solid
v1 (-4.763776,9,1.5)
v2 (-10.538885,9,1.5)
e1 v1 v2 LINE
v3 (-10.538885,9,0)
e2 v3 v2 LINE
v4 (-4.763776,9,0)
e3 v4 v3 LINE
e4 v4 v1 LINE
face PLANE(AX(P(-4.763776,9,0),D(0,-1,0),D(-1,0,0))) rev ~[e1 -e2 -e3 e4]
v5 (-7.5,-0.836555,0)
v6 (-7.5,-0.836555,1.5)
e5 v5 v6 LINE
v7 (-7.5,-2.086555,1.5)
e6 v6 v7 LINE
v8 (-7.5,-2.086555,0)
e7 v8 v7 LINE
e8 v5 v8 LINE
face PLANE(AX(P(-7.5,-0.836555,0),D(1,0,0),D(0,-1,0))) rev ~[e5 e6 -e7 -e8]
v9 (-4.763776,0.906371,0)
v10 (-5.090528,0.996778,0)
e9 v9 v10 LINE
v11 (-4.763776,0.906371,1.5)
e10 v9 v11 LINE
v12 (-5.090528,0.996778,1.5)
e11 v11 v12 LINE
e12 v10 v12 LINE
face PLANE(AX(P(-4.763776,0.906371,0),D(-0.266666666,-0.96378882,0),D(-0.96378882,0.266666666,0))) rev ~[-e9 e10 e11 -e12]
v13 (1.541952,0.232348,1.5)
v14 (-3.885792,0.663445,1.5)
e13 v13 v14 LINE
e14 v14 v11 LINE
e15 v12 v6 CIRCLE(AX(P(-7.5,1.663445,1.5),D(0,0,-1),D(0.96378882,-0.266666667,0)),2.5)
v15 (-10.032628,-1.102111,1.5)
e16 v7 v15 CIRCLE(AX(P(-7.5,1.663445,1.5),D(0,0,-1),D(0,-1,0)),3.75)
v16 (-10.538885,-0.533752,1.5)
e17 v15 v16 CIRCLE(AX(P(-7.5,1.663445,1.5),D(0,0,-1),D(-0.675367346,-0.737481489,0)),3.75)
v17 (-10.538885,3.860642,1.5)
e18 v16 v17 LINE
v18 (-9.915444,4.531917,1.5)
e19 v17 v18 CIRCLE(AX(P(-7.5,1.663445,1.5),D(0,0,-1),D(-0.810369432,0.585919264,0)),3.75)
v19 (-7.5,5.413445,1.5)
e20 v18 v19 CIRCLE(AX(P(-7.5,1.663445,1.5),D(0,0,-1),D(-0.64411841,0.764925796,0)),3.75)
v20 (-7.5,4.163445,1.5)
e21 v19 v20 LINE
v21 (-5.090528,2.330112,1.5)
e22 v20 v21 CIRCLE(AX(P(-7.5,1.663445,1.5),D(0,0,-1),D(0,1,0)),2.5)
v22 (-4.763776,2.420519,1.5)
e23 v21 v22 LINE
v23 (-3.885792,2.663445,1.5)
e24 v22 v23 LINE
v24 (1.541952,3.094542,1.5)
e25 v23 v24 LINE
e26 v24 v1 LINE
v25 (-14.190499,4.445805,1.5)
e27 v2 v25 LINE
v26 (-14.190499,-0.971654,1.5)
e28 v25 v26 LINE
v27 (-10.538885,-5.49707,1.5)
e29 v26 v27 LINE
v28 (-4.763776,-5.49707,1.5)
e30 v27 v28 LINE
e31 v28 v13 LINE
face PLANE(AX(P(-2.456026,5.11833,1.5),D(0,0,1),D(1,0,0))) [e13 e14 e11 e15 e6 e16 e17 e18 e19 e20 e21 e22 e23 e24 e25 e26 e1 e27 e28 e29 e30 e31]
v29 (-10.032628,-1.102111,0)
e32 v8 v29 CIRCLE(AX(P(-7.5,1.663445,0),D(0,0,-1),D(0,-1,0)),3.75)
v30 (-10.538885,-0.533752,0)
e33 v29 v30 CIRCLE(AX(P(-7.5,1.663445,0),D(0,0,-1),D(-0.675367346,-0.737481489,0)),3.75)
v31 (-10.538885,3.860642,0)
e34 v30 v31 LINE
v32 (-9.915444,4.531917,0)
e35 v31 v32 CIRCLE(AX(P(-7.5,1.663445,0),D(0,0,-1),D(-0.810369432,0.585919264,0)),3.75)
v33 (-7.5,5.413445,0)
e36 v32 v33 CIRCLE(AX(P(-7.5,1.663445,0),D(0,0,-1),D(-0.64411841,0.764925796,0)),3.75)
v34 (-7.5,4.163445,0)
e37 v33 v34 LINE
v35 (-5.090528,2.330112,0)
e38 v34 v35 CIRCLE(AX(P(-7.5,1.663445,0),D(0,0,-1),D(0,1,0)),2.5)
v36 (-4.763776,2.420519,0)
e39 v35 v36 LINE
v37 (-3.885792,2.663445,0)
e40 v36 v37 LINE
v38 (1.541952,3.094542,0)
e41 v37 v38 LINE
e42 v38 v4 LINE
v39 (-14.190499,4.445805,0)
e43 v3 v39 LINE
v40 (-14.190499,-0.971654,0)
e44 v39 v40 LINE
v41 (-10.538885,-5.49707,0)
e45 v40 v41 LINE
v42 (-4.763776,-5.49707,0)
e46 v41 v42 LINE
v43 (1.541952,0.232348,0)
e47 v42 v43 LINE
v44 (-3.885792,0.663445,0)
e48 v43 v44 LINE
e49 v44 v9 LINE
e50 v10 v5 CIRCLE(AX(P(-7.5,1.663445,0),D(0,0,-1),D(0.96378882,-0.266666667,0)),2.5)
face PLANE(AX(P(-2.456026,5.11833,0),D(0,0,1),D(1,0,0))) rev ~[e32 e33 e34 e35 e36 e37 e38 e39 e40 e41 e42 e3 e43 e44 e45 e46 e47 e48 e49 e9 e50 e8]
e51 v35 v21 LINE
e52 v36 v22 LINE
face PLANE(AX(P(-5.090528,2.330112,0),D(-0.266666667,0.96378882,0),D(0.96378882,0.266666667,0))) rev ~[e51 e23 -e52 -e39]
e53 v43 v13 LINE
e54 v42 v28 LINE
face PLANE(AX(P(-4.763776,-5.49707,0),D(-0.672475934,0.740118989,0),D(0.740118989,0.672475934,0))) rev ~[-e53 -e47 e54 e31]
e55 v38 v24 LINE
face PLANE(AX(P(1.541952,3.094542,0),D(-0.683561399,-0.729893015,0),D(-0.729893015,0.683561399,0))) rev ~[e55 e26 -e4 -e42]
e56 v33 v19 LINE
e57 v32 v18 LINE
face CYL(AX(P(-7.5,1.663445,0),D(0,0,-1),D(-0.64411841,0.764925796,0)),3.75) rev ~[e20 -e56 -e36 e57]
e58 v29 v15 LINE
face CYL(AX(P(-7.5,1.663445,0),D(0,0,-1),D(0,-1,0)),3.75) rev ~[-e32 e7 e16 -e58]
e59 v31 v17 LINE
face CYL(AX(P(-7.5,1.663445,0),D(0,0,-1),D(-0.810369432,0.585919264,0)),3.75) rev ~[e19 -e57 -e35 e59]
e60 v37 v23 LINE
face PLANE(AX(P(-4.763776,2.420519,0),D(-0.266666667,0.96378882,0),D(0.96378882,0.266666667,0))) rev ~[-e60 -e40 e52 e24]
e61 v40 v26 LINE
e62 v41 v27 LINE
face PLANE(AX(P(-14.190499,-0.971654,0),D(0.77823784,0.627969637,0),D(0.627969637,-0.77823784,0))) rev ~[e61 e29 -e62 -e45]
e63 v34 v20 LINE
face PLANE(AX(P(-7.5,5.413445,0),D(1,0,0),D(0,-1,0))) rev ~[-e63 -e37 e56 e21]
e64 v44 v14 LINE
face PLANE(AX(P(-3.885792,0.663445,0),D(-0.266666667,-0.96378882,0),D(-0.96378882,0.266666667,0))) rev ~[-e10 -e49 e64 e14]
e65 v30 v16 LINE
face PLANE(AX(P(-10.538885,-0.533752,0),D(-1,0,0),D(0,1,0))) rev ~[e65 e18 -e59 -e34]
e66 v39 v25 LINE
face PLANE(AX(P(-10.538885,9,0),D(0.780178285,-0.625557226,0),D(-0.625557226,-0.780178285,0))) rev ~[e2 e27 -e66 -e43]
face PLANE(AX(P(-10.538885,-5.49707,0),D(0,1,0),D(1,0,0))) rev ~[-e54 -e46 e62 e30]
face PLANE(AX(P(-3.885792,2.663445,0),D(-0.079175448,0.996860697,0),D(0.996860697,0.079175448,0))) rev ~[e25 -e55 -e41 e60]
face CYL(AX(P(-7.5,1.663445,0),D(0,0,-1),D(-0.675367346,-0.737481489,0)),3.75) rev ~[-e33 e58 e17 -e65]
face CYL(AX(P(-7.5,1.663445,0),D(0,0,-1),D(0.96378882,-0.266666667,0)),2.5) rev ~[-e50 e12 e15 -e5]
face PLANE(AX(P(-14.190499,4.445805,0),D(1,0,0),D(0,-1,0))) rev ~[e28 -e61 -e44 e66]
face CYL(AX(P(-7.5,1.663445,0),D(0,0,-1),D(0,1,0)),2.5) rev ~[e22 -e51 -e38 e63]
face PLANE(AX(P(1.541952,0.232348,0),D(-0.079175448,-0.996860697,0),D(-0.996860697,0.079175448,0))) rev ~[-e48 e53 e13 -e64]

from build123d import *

# Parameters (mm, degrees)
F1_DEPTH = 1.5


# Not quite as in the source:
# - a feature names something its author has since deleted; it is built from what else it names


with BuildPart() as f1:
    # F0 (on Top) → F1 (new body)
    with BuildSketch(Plane.XY):
        with BuildLine():
            ThreePointArc((-4.7637764364, 4.2277344156), (-4.22987066, 3.4988615225), (-3.8857919263, 2.6634449214))
            Line((-3.8857919263, 2.6634449214), (1.5419516712, 3.0945423002))
            Line((1.5419516712, 3.0945423002), (-4.7637764364, 9))
            Line((-4.7637764364, 9), (-4.7637764364, 4.2277344156))
        make_face()
        with BuildLine():
            ThreePointArc((-7.5, -2.0865550786), (-6.0089576806, -1.7773824212), (-4.7637764364, -0.9008445729))
            Line((-4.7637764364, -0.9008445729), (-4.7637764364, 0.9063707553))
            Line((-4.7637764364, 0.9063707553), (-5.0905279509, 0.9967782547))
            ThreePointArc((-5.0905279509, 0.9967782547), (-5.986174823, -0.326111143), (-7.5, -0.8365550786))
            Line((-7.5, -0.8365550786), (-7.5, -2.0865550786))
        make_face()
        with BuildLine():
            Line((-4.7637764364, 2.4205190875), (-4.7637764364, 4.2277344156))
            ThreePointArc((-4.7637764364, 4.2277344156), (-6.0089576806, 5.104272264), (-7.5, 5.4134449214))
            Line((-7.5, 5.4134449214), (-7.5, 4.1634449214))
            ThreePointArc((-7.5, 4.1634449214), (-5.986174823, 3.6530009858), (-5.0905279509, 2.330111588))
            Line((-5.0905279509, 2.330111588), (-4.7637764364, 2.4205190875))
        make_face()
        with BuildLine():
            Line((-10.5388853699, 1.6634449214), (-10.5388853699, 3.8606421607))
            ThreePointArc((-10.5388853699, 3.8606421607), (-11.0677948468, 2.8181483168), (-11.25, 1.6634449214))
            Line((-11.25, 1.6634449214), (-10.5388853699, 1.6634449214))
        make_face()
        with BuildLine():
            ThreePointArc((-11.25, 1.6634449214), (-11.0677948468, 0.5087415259), (-10.5388853699, -0.533752318))
            Line((-10.5388853699, -0.533752318), (-10.5388853699, 1.6634449214))
            Line((-10.5388853699, 1.6634449214), (-11.25, 1.6634449214))
        make_face()
        with BuildLine():
            Line((1.5419516712, 0.2323475426), (-3.8857919263, 0.6634449214))
            ThreePointArc((-3.8857919263, 0.6634449214), (-4.22987066, -0.1719716798), (-4.7637764364, -0.9008445729))
            Line((-4.7637764364, -0.9008445729), (-4.7637764364, -5.4970695637))
            Line((-4.7637764364, -5.4970695637), (1.5419516712, 0.2323475426))
        make_face()
        with BuildLine():
            Line((-4.7637764364, -5.4970695637), (-4.7637764364, -0.9008445729))
            ThreePointArc((-4.7637764364, -0.9008445729), (-6.0089576806, -1.7773824212), (-7.5, -2.0865550786))
            ThreePointArc((-7.5, -2.0865550786), (-8.8586144698, -1.831789938), (-10.0326275495, -1.102110664))
            ThreePointArc((-10.0326275495, -1.102110664), (-10.300213716, -0.8308091044), (-10.5388853699, -0.533752318))
            Line((-10.5388853699, -0.533752318), (-10.5388853699, -5.4970695637))
            Line((-10.5388853699, -5.4970695637), (-4.7637764364, -5.4970695637))
        make_face()
        with BuildLine():
            ThreePointArc((-7.5, 5.4134449214), (-6.0089576806, 5.104272264), (-4.7637764364, 4.2277344156))
            Line((-4.7637764364, 4.2277344156), (-4.7637764364, 9))
            Line((-4.7637764364, 9), (-10.5388853699, 9))
            Line((-10.5388853699, 9), (-10.5388853699, 3.8606421607))
            ThreePointArc((-10.5388853699, 3.8606421607), (-10.2477408327, 4.2153893401), (-9.9154440374, 4.5319166577))
            ThreePointArc((-9.9154440374, 4.5319166577), (-8.7856381662, 5.1861760359), (-7.5, 5.4134449214))
        make_face()
        with BuildLine():
            Line((-10.5388853699, 3.8606421607), (-10.5388853699, 9))
            Line((-10.5388853699, 9), (-14.1904987395, 4.4458052143))
            Line((-14.1904987395, 4.4458052143), (-14.1904987395, -0.9716537897))
            Line((-14.1904987395, -0.9716537897), (-10.5388853699, -5.4970695637))
            Line((-10.5388853699, -5.4970695637), (-10.5388853699, -0.533752318))
            ThreePointArc((-10.5388853699, -0.533752318), (-11.0677948468, 0.5087415259), (-11.25, 1.6634449214))
            ThreePointArc((-11.25, 1.6634449214), (-11.0677948468, 2.8181483168), (-10.5388853699, 3.8606421607))
        make_face()
        with BuildLine():
            ThreePointArc((-4.7637764364, -0.9008445729), (-4.22987066, -0.1719716798), (-3.8857919263, 0.6634449214))
            Line((-3.8857919263, 0.6634449214), (-4.7637764364, 0.9063707553))
            Line((-4.7637764364, 0.9063707553), (-4.7637764364, -0.9008445729))
        make_face()
        with BuildLine():
            Line((-4.7637764364, 2.4205190875), (-3.8857919263, 2.6634449214))
            ThreePointArc((-3.8857919263, 2.6634449214), (-4.22987066, 3.4988615225), (-4.7637764364, 4.2277344156))
            Line((-4.7637764364, 4.2277344156), (-4.7637764364, 2.4205190875))
        make_face()
    extrude(amount=F1_DEPTH)


solid = f1.part
